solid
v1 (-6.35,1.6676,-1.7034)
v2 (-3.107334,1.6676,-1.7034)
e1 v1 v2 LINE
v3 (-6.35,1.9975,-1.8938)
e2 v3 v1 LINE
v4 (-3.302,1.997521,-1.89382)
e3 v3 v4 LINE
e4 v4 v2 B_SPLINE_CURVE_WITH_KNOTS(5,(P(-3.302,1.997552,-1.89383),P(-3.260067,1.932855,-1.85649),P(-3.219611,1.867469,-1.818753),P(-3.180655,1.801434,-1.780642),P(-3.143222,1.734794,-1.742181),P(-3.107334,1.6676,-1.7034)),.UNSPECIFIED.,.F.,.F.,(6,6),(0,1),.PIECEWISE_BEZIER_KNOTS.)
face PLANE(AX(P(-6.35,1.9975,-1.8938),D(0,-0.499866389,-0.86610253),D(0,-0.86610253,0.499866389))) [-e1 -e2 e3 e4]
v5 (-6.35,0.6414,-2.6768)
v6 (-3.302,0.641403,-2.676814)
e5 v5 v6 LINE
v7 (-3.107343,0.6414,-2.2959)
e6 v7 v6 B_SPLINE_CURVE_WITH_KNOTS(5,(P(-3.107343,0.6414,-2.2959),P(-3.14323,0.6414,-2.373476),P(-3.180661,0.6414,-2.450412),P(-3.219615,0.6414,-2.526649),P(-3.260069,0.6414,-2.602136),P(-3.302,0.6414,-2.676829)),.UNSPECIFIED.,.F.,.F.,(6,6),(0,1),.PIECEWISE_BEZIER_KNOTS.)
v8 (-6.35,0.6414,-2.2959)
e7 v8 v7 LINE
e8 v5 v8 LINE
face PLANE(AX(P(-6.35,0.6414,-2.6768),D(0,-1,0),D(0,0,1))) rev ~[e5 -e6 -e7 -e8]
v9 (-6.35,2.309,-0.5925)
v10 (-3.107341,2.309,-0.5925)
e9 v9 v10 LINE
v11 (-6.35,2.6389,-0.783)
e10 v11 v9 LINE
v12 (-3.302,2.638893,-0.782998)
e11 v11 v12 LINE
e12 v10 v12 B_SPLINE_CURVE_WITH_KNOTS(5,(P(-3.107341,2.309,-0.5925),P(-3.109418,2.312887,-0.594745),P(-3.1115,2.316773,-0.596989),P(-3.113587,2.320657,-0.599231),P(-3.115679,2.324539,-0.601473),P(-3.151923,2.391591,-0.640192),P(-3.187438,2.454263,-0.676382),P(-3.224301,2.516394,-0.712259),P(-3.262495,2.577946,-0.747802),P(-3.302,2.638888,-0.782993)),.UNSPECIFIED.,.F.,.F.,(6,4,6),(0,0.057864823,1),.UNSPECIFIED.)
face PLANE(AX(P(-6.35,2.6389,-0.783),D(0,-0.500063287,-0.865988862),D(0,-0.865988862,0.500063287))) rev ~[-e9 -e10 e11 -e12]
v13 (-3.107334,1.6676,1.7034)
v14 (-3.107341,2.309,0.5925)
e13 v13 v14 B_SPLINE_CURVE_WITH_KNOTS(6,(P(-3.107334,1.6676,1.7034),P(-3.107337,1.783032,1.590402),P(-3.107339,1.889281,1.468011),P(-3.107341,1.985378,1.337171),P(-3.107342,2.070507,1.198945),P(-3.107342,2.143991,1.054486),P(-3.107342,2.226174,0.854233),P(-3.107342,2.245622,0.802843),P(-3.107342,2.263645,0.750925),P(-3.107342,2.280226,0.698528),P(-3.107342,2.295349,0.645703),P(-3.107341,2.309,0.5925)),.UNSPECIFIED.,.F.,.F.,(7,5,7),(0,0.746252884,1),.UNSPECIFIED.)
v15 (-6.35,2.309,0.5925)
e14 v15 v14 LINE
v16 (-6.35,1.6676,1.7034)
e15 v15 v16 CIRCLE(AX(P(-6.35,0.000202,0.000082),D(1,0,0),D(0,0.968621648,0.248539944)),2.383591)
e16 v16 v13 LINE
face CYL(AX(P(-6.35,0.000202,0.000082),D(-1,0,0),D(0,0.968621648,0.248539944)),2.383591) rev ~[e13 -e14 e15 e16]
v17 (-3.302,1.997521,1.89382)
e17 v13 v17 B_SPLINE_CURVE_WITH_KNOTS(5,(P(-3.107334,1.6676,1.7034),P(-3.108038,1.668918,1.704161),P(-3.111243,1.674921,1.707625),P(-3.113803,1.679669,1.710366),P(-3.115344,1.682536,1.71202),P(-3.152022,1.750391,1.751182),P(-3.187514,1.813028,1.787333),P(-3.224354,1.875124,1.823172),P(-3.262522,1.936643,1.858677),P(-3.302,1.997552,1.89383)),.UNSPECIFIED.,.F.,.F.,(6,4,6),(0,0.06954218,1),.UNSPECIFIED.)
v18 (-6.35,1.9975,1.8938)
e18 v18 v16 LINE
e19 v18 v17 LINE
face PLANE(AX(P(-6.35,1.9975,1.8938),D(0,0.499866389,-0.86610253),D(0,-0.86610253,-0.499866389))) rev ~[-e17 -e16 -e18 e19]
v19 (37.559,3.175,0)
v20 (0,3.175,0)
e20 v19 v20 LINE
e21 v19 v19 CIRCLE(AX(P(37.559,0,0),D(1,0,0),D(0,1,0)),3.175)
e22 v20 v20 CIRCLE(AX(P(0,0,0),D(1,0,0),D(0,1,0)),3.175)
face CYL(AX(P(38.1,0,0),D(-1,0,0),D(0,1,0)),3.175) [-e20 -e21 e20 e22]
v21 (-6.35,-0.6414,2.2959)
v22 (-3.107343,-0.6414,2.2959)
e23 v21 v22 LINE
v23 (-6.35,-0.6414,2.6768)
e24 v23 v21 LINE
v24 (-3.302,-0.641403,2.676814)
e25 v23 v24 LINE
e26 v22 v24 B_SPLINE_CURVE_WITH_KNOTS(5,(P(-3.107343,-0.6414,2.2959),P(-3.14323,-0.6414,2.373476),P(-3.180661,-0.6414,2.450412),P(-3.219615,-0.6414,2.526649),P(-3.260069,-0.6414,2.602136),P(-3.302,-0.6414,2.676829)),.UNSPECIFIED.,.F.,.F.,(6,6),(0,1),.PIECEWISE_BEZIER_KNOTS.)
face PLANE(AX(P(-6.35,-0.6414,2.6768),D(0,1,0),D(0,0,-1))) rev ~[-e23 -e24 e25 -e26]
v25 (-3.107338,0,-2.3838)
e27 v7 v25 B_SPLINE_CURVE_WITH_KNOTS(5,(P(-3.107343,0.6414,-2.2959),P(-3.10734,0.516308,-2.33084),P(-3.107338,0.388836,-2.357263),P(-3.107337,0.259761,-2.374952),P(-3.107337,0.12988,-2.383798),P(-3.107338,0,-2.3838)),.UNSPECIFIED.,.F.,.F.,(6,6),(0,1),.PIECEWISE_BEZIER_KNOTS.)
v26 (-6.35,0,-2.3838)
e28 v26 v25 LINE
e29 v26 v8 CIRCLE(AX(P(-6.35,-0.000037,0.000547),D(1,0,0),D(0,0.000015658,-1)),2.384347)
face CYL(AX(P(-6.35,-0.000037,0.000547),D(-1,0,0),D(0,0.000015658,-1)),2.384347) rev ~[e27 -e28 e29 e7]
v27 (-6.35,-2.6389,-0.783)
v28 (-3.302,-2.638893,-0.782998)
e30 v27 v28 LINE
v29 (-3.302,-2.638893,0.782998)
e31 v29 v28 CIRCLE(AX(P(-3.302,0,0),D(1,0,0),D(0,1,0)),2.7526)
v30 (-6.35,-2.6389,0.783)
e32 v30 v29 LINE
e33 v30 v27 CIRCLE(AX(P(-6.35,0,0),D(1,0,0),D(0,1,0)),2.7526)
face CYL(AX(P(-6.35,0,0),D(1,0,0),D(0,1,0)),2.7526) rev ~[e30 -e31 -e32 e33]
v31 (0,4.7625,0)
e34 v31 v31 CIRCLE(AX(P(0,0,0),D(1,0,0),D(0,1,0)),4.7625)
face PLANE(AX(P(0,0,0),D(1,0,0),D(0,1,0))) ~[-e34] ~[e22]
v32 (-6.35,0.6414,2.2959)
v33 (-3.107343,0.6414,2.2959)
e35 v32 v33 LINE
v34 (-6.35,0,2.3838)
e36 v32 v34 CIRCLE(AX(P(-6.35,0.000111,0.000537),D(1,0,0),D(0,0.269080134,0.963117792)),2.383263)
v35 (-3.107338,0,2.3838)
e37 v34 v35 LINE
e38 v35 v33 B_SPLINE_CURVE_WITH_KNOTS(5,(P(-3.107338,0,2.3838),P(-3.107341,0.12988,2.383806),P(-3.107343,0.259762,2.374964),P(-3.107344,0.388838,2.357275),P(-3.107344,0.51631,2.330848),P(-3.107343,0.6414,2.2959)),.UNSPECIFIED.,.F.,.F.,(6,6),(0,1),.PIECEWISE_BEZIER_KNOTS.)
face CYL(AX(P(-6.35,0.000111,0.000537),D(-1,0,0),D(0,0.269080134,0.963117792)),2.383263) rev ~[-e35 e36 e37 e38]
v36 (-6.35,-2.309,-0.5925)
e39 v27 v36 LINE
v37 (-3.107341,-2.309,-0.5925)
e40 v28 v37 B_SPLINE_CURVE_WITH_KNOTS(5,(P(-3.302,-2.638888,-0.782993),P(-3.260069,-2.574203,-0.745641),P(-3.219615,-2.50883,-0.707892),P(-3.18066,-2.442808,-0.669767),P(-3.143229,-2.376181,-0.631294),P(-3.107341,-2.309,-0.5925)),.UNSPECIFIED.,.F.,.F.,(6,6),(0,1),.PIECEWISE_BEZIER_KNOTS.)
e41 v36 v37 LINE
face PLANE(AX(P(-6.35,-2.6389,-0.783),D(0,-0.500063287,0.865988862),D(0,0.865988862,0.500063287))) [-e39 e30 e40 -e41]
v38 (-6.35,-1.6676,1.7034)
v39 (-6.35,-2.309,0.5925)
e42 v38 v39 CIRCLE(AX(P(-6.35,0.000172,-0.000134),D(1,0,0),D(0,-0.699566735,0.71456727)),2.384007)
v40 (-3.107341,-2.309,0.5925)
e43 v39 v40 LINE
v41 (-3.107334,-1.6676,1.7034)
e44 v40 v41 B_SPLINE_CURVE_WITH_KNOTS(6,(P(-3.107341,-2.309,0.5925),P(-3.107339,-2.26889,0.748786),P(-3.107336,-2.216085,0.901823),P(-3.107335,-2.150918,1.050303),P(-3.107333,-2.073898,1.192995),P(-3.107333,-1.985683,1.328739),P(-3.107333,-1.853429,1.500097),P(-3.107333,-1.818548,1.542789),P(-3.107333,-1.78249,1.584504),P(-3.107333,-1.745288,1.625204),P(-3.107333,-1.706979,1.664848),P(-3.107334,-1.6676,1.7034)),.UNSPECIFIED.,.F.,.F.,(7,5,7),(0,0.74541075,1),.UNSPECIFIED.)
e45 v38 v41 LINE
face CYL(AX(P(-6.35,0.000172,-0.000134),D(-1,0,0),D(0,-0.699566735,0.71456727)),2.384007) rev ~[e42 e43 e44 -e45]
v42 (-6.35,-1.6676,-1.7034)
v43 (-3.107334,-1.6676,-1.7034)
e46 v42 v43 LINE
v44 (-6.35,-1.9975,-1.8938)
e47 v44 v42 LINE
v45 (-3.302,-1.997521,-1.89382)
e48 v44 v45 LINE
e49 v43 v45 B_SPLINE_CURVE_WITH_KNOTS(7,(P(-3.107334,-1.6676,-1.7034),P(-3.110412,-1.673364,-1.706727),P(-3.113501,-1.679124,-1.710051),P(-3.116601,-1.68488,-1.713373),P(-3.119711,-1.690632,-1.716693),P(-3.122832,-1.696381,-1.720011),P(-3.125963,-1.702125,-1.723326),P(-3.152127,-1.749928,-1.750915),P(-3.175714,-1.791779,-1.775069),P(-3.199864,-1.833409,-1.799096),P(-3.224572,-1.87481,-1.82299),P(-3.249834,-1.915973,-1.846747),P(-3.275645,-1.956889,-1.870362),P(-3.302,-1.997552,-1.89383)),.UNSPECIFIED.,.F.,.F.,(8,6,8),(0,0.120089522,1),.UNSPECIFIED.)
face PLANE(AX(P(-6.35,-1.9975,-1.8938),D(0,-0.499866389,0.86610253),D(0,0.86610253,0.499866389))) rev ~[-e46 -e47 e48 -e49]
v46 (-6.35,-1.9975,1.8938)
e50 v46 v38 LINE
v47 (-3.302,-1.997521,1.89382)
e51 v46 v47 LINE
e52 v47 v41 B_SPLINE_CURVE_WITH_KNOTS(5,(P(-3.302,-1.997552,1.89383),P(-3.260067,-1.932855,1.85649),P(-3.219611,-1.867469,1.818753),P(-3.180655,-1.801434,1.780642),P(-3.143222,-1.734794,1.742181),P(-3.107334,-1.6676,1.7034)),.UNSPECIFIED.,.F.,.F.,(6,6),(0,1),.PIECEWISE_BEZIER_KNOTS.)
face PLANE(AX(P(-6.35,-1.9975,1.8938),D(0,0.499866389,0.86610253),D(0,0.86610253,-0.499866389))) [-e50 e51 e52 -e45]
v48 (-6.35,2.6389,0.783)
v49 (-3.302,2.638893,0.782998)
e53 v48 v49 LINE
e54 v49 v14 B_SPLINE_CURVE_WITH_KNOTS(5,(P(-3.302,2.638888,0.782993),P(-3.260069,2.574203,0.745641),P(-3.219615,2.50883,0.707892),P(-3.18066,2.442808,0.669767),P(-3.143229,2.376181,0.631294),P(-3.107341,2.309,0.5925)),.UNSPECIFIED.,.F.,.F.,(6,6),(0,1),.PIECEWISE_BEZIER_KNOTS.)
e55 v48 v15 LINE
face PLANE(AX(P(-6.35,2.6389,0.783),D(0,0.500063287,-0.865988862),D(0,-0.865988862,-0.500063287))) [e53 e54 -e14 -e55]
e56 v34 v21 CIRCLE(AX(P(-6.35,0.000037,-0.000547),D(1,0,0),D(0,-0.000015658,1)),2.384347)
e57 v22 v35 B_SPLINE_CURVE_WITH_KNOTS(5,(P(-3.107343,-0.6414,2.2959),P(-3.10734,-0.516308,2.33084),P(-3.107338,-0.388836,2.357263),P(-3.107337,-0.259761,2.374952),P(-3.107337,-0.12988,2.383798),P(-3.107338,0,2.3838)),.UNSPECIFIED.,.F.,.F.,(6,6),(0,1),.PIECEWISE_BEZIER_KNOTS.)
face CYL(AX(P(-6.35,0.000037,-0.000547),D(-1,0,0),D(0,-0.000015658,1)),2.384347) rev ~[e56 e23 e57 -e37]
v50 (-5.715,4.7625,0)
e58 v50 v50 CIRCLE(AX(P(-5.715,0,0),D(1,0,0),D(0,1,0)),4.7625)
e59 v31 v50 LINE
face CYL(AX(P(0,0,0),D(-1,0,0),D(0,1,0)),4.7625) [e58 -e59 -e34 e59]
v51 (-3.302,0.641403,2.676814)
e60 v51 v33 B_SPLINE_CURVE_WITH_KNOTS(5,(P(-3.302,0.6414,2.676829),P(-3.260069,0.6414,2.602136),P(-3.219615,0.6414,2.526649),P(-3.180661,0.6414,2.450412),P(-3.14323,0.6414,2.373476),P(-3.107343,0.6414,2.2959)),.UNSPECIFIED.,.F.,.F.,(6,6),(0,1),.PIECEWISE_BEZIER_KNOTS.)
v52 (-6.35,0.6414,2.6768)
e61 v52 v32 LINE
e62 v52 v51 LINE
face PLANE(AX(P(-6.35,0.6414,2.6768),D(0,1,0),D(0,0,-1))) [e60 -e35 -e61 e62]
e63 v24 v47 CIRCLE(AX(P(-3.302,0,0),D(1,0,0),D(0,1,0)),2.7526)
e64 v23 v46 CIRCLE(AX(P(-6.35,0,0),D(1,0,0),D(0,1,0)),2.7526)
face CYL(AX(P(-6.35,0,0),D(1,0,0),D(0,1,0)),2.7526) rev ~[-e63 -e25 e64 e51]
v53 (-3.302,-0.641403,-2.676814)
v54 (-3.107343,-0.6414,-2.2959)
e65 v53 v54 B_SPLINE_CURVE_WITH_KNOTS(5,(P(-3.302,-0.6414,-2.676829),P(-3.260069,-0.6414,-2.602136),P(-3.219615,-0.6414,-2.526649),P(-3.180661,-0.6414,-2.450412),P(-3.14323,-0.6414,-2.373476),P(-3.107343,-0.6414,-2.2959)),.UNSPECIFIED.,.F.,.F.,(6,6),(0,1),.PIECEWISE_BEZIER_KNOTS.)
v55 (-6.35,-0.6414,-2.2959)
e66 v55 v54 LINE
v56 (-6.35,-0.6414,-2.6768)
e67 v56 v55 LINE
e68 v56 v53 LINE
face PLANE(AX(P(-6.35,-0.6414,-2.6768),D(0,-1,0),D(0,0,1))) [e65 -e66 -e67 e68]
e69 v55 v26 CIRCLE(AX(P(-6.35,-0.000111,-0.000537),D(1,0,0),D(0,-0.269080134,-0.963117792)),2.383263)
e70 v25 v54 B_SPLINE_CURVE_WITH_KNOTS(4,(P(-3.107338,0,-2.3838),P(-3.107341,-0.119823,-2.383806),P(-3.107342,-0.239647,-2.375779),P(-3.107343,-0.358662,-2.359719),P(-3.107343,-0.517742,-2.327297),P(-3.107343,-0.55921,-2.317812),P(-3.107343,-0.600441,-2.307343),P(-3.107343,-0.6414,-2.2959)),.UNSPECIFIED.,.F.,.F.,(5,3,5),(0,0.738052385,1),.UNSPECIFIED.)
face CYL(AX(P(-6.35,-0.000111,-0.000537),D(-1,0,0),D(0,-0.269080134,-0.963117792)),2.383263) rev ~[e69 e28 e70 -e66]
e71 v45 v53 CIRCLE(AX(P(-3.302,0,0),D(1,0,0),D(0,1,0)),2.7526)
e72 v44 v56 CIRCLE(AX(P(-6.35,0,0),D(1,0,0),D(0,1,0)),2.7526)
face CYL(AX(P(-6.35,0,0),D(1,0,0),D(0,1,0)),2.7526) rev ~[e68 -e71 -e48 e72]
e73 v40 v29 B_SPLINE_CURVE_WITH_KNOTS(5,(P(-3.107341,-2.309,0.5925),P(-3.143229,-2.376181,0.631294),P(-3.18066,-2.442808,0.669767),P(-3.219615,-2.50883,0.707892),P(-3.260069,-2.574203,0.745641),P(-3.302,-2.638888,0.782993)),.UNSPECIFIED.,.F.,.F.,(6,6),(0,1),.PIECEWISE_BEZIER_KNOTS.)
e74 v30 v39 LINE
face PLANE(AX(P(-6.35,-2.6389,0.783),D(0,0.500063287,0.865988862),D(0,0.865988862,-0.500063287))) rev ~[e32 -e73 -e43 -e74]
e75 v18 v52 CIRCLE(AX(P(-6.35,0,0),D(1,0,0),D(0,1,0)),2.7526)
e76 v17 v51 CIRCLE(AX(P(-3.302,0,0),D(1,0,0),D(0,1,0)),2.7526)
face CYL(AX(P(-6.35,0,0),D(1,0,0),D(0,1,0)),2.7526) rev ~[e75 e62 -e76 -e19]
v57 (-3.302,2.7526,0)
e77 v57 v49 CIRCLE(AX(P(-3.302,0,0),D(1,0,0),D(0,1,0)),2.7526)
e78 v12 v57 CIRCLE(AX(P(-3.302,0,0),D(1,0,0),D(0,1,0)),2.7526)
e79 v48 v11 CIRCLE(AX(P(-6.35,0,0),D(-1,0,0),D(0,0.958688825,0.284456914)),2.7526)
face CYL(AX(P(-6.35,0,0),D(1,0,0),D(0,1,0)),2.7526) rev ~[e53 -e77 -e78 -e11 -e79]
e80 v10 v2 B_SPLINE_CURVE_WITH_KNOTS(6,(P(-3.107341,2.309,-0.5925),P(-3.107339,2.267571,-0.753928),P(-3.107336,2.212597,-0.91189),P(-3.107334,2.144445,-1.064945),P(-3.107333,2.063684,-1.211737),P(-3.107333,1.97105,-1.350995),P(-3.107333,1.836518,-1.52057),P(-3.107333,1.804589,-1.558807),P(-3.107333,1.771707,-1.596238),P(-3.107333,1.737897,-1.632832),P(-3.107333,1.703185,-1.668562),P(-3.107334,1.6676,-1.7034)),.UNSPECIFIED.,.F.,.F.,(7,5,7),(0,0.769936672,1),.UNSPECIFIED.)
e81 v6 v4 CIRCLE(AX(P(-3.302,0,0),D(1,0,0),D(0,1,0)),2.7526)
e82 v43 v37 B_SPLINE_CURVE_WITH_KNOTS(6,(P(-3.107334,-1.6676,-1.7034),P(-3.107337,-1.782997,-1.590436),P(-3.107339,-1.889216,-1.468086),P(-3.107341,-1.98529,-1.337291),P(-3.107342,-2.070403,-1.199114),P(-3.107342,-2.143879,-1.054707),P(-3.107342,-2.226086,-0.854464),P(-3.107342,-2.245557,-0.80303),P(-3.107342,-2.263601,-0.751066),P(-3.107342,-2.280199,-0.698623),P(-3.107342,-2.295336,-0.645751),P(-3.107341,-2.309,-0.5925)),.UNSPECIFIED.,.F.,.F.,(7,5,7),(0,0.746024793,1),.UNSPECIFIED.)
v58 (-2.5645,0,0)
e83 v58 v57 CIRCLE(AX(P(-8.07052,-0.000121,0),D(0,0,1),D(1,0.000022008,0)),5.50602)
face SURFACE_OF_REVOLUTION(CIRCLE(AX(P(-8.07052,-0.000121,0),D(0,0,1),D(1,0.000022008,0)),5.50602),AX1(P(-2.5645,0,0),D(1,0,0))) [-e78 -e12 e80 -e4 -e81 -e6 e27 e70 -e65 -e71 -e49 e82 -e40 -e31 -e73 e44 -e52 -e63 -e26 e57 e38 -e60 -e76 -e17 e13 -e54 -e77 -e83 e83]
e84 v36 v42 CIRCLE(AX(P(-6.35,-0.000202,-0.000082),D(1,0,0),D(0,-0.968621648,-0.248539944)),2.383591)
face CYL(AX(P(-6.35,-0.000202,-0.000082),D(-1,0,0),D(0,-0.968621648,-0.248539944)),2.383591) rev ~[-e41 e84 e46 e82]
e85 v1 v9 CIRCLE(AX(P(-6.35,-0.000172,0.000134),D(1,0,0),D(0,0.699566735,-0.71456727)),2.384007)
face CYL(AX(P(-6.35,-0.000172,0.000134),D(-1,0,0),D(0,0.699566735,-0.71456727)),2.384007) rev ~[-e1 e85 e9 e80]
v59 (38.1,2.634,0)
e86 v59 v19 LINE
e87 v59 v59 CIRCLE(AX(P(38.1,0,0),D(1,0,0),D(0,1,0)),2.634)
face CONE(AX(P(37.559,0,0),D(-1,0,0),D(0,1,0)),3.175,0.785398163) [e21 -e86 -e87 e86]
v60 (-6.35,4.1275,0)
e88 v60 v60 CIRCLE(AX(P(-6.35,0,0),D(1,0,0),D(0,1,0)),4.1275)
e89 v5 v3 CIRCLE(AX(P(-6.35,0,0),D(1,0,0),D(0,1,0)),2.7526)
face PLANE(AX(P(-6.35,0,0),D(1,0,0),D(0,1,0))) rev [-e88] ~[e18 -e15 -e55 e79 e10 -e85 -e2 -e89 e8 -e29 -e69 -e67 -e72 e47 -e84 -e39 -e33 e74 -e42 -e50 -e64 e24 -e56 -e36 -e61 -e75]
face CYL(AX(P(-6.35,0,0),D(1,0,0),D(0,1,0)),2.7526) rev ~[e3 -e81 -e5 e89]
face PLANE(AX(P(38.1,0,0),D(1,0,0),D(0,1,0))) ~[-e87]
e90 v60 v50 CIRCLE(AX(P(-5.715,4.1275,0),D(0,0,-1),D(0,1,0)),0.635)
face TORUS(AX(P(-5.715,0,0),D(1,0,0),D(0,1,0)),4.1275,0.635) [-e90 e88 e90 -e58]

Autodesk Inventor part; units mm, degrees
ref_plane "YZ Plane" through (0, 0, 0) normal (1, 0, 0) x (0, 1, 0)
sketch "Sketch1" plane through (0, 0, 0) normal (0, 0, 1) x (1, 0, 0)
  line L0 (-6.35, 0) -> (38.1, 0)
  line L1 (38.1, 0) -> (38.1, 3.175)
  line L2 (38.1, 3.175) -> (0, 3.175)
  line L3 (0, 3.175) -> (0, 4.7625)
  line L4 (-17.3035, 0) -> (47.3339, 0) projected
  line L5 (0, -0.9525) -> (0, 5.715) projected
  line L6 (0, 4.7625) -> (-6.35, 4.7625)
  line L7 (-6.35, 0) -> (-6.35, 4.7625)
  arc A0 (-2.5645, 0) -> (-3.302, 2.7526) centre (-8.0696, 0) ccw
  line L8 (-6.35, 2.7526) -> (-3.302, 2.7526)
  line L9 (12.7, 3.175) -> (0, 3.175) construction
  dimension "d0" = 38.1
  dimension "d1" = 6.35
  dimension "d2" = 6.35
  dimension "d5" = 9.525
  dimension "d13" = 5.5051
  dimension "d14" = 5.5051
  dimension "d15" = 3.048
revolve "Body" add sketch "Sketch1" angle 360 about axis through (-6.35, 0, 0) along (1, 0, 0) contours A0 L8 L7 L6 L3 L5 L0 | L5 L2 L1 L0
ref_plane "IDS_WORKPLANE{1}" through (-6.35, 0, 0) normal (1, 0, 0) x (0, 0, -1)
sketch "Sketch2" plane through (-6.35, 0, 0) normal (1, 0, 0) x (0, 0, -1)
  line L0 (0, -6.6675) -> (0, 6.6675) projected
  line L1 (6.6675, 0) -> (-6.6675, 0) projected
  circle A0 centre (0, 0) radius 4.7625 projected
  line L2 (2.6768, 0.6414) -> (2.2959, 0.6414)
  line L3 (0, 0) -> (2.6768, 0.6414) construction
  line L4 (0, 0) -> (4.0727, 3.8613) construction
  line L5 (0, 0) -> (0.783, 2.6389) construction
  line L6 (0, 0) -> (1.3763, 2.3838) construction
  line L7 (0.783, 2.6389) -> (0.5925, 2.309)
  line L8 (1.8938, 1.9975) -> (1.7034, 1.6676)
  line L9 (0, 0) -> (1.8938, 1.9975) construction
  arc A1 (2.3838, 0) -> (2.2959, 0.6414) centre (0, 0) ccw
  arc A2 (1.7034, 1.6676) -> (0.5925, 2.309) centre (0, 0) ccw
  arc A3 (2.7526, 0) -> (2.6768, 0.6414) centre (0, 0) ccw
  arc A4 (1.8938, 1.9975) -> (0.783, 2.6389) centre (0, 0) ccw
  arc A5 (2.6768, 0.6414) -> (1.6232, 2.223) centre (0, 0) ccw construction
  arc A6 (2.2959, 0.6414) -> (1.7034, 1.6676) centre (0, 0) ccw construction
  line L10 (2.6768, -0.6414) -> (2.2959, -0.6414)
  line L11 (0.783, -2.6389) -> (0.5925, -2.309)
  line L12 (1.8938, -1.9975) -> (1.7034, -1.6676)
  arc A7 (2.2959, -0.6414) -> (2.3838, 0) centre (0, 0) ccw
  arc A8 (0.5925, -2.309) -> (1.7034, -1.6676) centre (0, 0) ccw
  arc A9 (2.6768, -0.6414) -> (2.7526, 0) centre (0, 0) ccw
  arc A10 (0.783, -2.6389) -> (1.8938, -1.9975) centre (0, 0) ccw
  line L13 (-2.6768, 0.6414) -> (-2.2959, 0.6414)
  line L14 (-0.783, 2.6389) -> (-0.5925, 2.309)
  line L15 (-1.8938, 1.9975) -> (-1.7034, 1.6676)
  arc A11 (-2.2959, 0.6414) -> (-2.3838, 0) centre (0, 0) ccw
  arc A12 (-0.5925, 2.309) -> (-1.7034, 1.6676) centre (0, 0) ccw
  arc A13 (-2.6768, 0.6414) -> (-2.7526, 0) centre (0, 0) ccw
  arc A14 (-0.783, 2.6389) -> (-1.8938, 1.9975) centre (0, 0) ccw
  line L16 (-0.783, -2.6389) -> (-0.5925, -2.309)
  arc A15 (-1.7034, -1.6676) -> (-0.5925, -2.309) centre (0, 0) ccw
  line L17 (-1.8938, -1.9975) -> (-1.7034, -1.6676)
  arc A16 (-1.8938, -1.9975) -> (-0.783, -2.6389) centre (0, 0) ccw
  arc A17 (-2.3838, 0) -> (-2.2959, -0.6414) centre (0, 0) ccw
  line L18 (-2.6768, -0.6414) -> (-2.2959, -0.6414)
  arc A18 (-2.7526, 0) -> (-2.6768, -0.6414) centre (0, 0) ccw
  point P0 (1.3763, -2.3838)
  point P1 (-1.3763, 2.3838)
  point P2 (-1.3763, -2.3838)
  dimension "d19" = 0.6413
  dimension "d20" = 1.2827
  dimension "d21" = 33.052
  dimension "d22" = 5.5051
  dimension "d23" = 4.7676
extrude "Slot" add sketch "Sketch2" along normal up to next contours A1 L2 A3 L1 | L1 A9 L10 A7 | A17 L18 A18 L1 | L1 A13 L13 A11 | A4 L8 A2 L7 | L11 A8 L12 A10 | L14 A12 L15 A14 | A16 L17 A15 L16
fillet "Fillet1" radius 0.635 1 edges at (-6.35, -4.7625, 0)
thread "Thread" size "1/4-28 UNF" class "2A" standard "ANSI Unified Screw Threads" length 25.4
chamfer "Chamfer1" distance 0.541 distance2 0.541 1 edges at (38.1, -3.175, 0) measured on face at (38.1, -0.6107, -1.4381)
ref_plane "Work Plane2" through (-3.175, 0, 0) normal (0, 0, -1) x (1, 0, 0)
equation "\"d19\" = 0.5 * SBR"
equation "\"d20\" = SBR"
equation "\"d22\" = 1.1547 * SW"
equation "\"d23\" = SW"
equation "\"d17\" = INTI"
equation "\"d24\" = RR"
equation "\"d6\" = GEL"
equation "\"d9\" = -0.5 * SPD + 0.5 * NND"
equation "\"d10\" = GUL"
equation "\"d0\" = NLG"
equation "\"d1\" = KOH"
equation "\"d2\" = NND"
equation "\"d5\" = KOD"
equation "\"d13\" = 1.1547 * SW"
equation "\"d14\" = 1.1547 * SW"
equation "\"d15\" = INTI"
equation "\"NND\" = 6.35"
equation "\"NLG\" = 38.1"
equation "\"GEL\" = 25.4"
equation "\"KOD\" = 9.525"
equation "\"KOH\" = 6.35"
equation "\"SPD\" = GD1"
equation "\"GUL\" = 0.54102"
equation "\"SBR\" = 1.2827"
equation "\"INTI\" = 3.048"
equation "\"d11\" = -KOH"
equation "\"SW\" = 4.76758"
equation "\"d16\" = 1.1547 * SW"
equation "\"d18\" = SW"
equation "\"RR\" = 0.635"
equation "\"TOA\" = 30deg"
equation "\"GD1\" = 5.26796"
equation "\"THREADDIA\" = 6.35"
equation "\"BDM\" = NND"
equation "\"GD\" = NND"
equation "\"GAL\" = 1.36068"
equation "\"E0\" = 5.55498"
properties part number "ANSI B18.3 - 1/4-28 UNF - 1.5" material "Steel, Mild"
